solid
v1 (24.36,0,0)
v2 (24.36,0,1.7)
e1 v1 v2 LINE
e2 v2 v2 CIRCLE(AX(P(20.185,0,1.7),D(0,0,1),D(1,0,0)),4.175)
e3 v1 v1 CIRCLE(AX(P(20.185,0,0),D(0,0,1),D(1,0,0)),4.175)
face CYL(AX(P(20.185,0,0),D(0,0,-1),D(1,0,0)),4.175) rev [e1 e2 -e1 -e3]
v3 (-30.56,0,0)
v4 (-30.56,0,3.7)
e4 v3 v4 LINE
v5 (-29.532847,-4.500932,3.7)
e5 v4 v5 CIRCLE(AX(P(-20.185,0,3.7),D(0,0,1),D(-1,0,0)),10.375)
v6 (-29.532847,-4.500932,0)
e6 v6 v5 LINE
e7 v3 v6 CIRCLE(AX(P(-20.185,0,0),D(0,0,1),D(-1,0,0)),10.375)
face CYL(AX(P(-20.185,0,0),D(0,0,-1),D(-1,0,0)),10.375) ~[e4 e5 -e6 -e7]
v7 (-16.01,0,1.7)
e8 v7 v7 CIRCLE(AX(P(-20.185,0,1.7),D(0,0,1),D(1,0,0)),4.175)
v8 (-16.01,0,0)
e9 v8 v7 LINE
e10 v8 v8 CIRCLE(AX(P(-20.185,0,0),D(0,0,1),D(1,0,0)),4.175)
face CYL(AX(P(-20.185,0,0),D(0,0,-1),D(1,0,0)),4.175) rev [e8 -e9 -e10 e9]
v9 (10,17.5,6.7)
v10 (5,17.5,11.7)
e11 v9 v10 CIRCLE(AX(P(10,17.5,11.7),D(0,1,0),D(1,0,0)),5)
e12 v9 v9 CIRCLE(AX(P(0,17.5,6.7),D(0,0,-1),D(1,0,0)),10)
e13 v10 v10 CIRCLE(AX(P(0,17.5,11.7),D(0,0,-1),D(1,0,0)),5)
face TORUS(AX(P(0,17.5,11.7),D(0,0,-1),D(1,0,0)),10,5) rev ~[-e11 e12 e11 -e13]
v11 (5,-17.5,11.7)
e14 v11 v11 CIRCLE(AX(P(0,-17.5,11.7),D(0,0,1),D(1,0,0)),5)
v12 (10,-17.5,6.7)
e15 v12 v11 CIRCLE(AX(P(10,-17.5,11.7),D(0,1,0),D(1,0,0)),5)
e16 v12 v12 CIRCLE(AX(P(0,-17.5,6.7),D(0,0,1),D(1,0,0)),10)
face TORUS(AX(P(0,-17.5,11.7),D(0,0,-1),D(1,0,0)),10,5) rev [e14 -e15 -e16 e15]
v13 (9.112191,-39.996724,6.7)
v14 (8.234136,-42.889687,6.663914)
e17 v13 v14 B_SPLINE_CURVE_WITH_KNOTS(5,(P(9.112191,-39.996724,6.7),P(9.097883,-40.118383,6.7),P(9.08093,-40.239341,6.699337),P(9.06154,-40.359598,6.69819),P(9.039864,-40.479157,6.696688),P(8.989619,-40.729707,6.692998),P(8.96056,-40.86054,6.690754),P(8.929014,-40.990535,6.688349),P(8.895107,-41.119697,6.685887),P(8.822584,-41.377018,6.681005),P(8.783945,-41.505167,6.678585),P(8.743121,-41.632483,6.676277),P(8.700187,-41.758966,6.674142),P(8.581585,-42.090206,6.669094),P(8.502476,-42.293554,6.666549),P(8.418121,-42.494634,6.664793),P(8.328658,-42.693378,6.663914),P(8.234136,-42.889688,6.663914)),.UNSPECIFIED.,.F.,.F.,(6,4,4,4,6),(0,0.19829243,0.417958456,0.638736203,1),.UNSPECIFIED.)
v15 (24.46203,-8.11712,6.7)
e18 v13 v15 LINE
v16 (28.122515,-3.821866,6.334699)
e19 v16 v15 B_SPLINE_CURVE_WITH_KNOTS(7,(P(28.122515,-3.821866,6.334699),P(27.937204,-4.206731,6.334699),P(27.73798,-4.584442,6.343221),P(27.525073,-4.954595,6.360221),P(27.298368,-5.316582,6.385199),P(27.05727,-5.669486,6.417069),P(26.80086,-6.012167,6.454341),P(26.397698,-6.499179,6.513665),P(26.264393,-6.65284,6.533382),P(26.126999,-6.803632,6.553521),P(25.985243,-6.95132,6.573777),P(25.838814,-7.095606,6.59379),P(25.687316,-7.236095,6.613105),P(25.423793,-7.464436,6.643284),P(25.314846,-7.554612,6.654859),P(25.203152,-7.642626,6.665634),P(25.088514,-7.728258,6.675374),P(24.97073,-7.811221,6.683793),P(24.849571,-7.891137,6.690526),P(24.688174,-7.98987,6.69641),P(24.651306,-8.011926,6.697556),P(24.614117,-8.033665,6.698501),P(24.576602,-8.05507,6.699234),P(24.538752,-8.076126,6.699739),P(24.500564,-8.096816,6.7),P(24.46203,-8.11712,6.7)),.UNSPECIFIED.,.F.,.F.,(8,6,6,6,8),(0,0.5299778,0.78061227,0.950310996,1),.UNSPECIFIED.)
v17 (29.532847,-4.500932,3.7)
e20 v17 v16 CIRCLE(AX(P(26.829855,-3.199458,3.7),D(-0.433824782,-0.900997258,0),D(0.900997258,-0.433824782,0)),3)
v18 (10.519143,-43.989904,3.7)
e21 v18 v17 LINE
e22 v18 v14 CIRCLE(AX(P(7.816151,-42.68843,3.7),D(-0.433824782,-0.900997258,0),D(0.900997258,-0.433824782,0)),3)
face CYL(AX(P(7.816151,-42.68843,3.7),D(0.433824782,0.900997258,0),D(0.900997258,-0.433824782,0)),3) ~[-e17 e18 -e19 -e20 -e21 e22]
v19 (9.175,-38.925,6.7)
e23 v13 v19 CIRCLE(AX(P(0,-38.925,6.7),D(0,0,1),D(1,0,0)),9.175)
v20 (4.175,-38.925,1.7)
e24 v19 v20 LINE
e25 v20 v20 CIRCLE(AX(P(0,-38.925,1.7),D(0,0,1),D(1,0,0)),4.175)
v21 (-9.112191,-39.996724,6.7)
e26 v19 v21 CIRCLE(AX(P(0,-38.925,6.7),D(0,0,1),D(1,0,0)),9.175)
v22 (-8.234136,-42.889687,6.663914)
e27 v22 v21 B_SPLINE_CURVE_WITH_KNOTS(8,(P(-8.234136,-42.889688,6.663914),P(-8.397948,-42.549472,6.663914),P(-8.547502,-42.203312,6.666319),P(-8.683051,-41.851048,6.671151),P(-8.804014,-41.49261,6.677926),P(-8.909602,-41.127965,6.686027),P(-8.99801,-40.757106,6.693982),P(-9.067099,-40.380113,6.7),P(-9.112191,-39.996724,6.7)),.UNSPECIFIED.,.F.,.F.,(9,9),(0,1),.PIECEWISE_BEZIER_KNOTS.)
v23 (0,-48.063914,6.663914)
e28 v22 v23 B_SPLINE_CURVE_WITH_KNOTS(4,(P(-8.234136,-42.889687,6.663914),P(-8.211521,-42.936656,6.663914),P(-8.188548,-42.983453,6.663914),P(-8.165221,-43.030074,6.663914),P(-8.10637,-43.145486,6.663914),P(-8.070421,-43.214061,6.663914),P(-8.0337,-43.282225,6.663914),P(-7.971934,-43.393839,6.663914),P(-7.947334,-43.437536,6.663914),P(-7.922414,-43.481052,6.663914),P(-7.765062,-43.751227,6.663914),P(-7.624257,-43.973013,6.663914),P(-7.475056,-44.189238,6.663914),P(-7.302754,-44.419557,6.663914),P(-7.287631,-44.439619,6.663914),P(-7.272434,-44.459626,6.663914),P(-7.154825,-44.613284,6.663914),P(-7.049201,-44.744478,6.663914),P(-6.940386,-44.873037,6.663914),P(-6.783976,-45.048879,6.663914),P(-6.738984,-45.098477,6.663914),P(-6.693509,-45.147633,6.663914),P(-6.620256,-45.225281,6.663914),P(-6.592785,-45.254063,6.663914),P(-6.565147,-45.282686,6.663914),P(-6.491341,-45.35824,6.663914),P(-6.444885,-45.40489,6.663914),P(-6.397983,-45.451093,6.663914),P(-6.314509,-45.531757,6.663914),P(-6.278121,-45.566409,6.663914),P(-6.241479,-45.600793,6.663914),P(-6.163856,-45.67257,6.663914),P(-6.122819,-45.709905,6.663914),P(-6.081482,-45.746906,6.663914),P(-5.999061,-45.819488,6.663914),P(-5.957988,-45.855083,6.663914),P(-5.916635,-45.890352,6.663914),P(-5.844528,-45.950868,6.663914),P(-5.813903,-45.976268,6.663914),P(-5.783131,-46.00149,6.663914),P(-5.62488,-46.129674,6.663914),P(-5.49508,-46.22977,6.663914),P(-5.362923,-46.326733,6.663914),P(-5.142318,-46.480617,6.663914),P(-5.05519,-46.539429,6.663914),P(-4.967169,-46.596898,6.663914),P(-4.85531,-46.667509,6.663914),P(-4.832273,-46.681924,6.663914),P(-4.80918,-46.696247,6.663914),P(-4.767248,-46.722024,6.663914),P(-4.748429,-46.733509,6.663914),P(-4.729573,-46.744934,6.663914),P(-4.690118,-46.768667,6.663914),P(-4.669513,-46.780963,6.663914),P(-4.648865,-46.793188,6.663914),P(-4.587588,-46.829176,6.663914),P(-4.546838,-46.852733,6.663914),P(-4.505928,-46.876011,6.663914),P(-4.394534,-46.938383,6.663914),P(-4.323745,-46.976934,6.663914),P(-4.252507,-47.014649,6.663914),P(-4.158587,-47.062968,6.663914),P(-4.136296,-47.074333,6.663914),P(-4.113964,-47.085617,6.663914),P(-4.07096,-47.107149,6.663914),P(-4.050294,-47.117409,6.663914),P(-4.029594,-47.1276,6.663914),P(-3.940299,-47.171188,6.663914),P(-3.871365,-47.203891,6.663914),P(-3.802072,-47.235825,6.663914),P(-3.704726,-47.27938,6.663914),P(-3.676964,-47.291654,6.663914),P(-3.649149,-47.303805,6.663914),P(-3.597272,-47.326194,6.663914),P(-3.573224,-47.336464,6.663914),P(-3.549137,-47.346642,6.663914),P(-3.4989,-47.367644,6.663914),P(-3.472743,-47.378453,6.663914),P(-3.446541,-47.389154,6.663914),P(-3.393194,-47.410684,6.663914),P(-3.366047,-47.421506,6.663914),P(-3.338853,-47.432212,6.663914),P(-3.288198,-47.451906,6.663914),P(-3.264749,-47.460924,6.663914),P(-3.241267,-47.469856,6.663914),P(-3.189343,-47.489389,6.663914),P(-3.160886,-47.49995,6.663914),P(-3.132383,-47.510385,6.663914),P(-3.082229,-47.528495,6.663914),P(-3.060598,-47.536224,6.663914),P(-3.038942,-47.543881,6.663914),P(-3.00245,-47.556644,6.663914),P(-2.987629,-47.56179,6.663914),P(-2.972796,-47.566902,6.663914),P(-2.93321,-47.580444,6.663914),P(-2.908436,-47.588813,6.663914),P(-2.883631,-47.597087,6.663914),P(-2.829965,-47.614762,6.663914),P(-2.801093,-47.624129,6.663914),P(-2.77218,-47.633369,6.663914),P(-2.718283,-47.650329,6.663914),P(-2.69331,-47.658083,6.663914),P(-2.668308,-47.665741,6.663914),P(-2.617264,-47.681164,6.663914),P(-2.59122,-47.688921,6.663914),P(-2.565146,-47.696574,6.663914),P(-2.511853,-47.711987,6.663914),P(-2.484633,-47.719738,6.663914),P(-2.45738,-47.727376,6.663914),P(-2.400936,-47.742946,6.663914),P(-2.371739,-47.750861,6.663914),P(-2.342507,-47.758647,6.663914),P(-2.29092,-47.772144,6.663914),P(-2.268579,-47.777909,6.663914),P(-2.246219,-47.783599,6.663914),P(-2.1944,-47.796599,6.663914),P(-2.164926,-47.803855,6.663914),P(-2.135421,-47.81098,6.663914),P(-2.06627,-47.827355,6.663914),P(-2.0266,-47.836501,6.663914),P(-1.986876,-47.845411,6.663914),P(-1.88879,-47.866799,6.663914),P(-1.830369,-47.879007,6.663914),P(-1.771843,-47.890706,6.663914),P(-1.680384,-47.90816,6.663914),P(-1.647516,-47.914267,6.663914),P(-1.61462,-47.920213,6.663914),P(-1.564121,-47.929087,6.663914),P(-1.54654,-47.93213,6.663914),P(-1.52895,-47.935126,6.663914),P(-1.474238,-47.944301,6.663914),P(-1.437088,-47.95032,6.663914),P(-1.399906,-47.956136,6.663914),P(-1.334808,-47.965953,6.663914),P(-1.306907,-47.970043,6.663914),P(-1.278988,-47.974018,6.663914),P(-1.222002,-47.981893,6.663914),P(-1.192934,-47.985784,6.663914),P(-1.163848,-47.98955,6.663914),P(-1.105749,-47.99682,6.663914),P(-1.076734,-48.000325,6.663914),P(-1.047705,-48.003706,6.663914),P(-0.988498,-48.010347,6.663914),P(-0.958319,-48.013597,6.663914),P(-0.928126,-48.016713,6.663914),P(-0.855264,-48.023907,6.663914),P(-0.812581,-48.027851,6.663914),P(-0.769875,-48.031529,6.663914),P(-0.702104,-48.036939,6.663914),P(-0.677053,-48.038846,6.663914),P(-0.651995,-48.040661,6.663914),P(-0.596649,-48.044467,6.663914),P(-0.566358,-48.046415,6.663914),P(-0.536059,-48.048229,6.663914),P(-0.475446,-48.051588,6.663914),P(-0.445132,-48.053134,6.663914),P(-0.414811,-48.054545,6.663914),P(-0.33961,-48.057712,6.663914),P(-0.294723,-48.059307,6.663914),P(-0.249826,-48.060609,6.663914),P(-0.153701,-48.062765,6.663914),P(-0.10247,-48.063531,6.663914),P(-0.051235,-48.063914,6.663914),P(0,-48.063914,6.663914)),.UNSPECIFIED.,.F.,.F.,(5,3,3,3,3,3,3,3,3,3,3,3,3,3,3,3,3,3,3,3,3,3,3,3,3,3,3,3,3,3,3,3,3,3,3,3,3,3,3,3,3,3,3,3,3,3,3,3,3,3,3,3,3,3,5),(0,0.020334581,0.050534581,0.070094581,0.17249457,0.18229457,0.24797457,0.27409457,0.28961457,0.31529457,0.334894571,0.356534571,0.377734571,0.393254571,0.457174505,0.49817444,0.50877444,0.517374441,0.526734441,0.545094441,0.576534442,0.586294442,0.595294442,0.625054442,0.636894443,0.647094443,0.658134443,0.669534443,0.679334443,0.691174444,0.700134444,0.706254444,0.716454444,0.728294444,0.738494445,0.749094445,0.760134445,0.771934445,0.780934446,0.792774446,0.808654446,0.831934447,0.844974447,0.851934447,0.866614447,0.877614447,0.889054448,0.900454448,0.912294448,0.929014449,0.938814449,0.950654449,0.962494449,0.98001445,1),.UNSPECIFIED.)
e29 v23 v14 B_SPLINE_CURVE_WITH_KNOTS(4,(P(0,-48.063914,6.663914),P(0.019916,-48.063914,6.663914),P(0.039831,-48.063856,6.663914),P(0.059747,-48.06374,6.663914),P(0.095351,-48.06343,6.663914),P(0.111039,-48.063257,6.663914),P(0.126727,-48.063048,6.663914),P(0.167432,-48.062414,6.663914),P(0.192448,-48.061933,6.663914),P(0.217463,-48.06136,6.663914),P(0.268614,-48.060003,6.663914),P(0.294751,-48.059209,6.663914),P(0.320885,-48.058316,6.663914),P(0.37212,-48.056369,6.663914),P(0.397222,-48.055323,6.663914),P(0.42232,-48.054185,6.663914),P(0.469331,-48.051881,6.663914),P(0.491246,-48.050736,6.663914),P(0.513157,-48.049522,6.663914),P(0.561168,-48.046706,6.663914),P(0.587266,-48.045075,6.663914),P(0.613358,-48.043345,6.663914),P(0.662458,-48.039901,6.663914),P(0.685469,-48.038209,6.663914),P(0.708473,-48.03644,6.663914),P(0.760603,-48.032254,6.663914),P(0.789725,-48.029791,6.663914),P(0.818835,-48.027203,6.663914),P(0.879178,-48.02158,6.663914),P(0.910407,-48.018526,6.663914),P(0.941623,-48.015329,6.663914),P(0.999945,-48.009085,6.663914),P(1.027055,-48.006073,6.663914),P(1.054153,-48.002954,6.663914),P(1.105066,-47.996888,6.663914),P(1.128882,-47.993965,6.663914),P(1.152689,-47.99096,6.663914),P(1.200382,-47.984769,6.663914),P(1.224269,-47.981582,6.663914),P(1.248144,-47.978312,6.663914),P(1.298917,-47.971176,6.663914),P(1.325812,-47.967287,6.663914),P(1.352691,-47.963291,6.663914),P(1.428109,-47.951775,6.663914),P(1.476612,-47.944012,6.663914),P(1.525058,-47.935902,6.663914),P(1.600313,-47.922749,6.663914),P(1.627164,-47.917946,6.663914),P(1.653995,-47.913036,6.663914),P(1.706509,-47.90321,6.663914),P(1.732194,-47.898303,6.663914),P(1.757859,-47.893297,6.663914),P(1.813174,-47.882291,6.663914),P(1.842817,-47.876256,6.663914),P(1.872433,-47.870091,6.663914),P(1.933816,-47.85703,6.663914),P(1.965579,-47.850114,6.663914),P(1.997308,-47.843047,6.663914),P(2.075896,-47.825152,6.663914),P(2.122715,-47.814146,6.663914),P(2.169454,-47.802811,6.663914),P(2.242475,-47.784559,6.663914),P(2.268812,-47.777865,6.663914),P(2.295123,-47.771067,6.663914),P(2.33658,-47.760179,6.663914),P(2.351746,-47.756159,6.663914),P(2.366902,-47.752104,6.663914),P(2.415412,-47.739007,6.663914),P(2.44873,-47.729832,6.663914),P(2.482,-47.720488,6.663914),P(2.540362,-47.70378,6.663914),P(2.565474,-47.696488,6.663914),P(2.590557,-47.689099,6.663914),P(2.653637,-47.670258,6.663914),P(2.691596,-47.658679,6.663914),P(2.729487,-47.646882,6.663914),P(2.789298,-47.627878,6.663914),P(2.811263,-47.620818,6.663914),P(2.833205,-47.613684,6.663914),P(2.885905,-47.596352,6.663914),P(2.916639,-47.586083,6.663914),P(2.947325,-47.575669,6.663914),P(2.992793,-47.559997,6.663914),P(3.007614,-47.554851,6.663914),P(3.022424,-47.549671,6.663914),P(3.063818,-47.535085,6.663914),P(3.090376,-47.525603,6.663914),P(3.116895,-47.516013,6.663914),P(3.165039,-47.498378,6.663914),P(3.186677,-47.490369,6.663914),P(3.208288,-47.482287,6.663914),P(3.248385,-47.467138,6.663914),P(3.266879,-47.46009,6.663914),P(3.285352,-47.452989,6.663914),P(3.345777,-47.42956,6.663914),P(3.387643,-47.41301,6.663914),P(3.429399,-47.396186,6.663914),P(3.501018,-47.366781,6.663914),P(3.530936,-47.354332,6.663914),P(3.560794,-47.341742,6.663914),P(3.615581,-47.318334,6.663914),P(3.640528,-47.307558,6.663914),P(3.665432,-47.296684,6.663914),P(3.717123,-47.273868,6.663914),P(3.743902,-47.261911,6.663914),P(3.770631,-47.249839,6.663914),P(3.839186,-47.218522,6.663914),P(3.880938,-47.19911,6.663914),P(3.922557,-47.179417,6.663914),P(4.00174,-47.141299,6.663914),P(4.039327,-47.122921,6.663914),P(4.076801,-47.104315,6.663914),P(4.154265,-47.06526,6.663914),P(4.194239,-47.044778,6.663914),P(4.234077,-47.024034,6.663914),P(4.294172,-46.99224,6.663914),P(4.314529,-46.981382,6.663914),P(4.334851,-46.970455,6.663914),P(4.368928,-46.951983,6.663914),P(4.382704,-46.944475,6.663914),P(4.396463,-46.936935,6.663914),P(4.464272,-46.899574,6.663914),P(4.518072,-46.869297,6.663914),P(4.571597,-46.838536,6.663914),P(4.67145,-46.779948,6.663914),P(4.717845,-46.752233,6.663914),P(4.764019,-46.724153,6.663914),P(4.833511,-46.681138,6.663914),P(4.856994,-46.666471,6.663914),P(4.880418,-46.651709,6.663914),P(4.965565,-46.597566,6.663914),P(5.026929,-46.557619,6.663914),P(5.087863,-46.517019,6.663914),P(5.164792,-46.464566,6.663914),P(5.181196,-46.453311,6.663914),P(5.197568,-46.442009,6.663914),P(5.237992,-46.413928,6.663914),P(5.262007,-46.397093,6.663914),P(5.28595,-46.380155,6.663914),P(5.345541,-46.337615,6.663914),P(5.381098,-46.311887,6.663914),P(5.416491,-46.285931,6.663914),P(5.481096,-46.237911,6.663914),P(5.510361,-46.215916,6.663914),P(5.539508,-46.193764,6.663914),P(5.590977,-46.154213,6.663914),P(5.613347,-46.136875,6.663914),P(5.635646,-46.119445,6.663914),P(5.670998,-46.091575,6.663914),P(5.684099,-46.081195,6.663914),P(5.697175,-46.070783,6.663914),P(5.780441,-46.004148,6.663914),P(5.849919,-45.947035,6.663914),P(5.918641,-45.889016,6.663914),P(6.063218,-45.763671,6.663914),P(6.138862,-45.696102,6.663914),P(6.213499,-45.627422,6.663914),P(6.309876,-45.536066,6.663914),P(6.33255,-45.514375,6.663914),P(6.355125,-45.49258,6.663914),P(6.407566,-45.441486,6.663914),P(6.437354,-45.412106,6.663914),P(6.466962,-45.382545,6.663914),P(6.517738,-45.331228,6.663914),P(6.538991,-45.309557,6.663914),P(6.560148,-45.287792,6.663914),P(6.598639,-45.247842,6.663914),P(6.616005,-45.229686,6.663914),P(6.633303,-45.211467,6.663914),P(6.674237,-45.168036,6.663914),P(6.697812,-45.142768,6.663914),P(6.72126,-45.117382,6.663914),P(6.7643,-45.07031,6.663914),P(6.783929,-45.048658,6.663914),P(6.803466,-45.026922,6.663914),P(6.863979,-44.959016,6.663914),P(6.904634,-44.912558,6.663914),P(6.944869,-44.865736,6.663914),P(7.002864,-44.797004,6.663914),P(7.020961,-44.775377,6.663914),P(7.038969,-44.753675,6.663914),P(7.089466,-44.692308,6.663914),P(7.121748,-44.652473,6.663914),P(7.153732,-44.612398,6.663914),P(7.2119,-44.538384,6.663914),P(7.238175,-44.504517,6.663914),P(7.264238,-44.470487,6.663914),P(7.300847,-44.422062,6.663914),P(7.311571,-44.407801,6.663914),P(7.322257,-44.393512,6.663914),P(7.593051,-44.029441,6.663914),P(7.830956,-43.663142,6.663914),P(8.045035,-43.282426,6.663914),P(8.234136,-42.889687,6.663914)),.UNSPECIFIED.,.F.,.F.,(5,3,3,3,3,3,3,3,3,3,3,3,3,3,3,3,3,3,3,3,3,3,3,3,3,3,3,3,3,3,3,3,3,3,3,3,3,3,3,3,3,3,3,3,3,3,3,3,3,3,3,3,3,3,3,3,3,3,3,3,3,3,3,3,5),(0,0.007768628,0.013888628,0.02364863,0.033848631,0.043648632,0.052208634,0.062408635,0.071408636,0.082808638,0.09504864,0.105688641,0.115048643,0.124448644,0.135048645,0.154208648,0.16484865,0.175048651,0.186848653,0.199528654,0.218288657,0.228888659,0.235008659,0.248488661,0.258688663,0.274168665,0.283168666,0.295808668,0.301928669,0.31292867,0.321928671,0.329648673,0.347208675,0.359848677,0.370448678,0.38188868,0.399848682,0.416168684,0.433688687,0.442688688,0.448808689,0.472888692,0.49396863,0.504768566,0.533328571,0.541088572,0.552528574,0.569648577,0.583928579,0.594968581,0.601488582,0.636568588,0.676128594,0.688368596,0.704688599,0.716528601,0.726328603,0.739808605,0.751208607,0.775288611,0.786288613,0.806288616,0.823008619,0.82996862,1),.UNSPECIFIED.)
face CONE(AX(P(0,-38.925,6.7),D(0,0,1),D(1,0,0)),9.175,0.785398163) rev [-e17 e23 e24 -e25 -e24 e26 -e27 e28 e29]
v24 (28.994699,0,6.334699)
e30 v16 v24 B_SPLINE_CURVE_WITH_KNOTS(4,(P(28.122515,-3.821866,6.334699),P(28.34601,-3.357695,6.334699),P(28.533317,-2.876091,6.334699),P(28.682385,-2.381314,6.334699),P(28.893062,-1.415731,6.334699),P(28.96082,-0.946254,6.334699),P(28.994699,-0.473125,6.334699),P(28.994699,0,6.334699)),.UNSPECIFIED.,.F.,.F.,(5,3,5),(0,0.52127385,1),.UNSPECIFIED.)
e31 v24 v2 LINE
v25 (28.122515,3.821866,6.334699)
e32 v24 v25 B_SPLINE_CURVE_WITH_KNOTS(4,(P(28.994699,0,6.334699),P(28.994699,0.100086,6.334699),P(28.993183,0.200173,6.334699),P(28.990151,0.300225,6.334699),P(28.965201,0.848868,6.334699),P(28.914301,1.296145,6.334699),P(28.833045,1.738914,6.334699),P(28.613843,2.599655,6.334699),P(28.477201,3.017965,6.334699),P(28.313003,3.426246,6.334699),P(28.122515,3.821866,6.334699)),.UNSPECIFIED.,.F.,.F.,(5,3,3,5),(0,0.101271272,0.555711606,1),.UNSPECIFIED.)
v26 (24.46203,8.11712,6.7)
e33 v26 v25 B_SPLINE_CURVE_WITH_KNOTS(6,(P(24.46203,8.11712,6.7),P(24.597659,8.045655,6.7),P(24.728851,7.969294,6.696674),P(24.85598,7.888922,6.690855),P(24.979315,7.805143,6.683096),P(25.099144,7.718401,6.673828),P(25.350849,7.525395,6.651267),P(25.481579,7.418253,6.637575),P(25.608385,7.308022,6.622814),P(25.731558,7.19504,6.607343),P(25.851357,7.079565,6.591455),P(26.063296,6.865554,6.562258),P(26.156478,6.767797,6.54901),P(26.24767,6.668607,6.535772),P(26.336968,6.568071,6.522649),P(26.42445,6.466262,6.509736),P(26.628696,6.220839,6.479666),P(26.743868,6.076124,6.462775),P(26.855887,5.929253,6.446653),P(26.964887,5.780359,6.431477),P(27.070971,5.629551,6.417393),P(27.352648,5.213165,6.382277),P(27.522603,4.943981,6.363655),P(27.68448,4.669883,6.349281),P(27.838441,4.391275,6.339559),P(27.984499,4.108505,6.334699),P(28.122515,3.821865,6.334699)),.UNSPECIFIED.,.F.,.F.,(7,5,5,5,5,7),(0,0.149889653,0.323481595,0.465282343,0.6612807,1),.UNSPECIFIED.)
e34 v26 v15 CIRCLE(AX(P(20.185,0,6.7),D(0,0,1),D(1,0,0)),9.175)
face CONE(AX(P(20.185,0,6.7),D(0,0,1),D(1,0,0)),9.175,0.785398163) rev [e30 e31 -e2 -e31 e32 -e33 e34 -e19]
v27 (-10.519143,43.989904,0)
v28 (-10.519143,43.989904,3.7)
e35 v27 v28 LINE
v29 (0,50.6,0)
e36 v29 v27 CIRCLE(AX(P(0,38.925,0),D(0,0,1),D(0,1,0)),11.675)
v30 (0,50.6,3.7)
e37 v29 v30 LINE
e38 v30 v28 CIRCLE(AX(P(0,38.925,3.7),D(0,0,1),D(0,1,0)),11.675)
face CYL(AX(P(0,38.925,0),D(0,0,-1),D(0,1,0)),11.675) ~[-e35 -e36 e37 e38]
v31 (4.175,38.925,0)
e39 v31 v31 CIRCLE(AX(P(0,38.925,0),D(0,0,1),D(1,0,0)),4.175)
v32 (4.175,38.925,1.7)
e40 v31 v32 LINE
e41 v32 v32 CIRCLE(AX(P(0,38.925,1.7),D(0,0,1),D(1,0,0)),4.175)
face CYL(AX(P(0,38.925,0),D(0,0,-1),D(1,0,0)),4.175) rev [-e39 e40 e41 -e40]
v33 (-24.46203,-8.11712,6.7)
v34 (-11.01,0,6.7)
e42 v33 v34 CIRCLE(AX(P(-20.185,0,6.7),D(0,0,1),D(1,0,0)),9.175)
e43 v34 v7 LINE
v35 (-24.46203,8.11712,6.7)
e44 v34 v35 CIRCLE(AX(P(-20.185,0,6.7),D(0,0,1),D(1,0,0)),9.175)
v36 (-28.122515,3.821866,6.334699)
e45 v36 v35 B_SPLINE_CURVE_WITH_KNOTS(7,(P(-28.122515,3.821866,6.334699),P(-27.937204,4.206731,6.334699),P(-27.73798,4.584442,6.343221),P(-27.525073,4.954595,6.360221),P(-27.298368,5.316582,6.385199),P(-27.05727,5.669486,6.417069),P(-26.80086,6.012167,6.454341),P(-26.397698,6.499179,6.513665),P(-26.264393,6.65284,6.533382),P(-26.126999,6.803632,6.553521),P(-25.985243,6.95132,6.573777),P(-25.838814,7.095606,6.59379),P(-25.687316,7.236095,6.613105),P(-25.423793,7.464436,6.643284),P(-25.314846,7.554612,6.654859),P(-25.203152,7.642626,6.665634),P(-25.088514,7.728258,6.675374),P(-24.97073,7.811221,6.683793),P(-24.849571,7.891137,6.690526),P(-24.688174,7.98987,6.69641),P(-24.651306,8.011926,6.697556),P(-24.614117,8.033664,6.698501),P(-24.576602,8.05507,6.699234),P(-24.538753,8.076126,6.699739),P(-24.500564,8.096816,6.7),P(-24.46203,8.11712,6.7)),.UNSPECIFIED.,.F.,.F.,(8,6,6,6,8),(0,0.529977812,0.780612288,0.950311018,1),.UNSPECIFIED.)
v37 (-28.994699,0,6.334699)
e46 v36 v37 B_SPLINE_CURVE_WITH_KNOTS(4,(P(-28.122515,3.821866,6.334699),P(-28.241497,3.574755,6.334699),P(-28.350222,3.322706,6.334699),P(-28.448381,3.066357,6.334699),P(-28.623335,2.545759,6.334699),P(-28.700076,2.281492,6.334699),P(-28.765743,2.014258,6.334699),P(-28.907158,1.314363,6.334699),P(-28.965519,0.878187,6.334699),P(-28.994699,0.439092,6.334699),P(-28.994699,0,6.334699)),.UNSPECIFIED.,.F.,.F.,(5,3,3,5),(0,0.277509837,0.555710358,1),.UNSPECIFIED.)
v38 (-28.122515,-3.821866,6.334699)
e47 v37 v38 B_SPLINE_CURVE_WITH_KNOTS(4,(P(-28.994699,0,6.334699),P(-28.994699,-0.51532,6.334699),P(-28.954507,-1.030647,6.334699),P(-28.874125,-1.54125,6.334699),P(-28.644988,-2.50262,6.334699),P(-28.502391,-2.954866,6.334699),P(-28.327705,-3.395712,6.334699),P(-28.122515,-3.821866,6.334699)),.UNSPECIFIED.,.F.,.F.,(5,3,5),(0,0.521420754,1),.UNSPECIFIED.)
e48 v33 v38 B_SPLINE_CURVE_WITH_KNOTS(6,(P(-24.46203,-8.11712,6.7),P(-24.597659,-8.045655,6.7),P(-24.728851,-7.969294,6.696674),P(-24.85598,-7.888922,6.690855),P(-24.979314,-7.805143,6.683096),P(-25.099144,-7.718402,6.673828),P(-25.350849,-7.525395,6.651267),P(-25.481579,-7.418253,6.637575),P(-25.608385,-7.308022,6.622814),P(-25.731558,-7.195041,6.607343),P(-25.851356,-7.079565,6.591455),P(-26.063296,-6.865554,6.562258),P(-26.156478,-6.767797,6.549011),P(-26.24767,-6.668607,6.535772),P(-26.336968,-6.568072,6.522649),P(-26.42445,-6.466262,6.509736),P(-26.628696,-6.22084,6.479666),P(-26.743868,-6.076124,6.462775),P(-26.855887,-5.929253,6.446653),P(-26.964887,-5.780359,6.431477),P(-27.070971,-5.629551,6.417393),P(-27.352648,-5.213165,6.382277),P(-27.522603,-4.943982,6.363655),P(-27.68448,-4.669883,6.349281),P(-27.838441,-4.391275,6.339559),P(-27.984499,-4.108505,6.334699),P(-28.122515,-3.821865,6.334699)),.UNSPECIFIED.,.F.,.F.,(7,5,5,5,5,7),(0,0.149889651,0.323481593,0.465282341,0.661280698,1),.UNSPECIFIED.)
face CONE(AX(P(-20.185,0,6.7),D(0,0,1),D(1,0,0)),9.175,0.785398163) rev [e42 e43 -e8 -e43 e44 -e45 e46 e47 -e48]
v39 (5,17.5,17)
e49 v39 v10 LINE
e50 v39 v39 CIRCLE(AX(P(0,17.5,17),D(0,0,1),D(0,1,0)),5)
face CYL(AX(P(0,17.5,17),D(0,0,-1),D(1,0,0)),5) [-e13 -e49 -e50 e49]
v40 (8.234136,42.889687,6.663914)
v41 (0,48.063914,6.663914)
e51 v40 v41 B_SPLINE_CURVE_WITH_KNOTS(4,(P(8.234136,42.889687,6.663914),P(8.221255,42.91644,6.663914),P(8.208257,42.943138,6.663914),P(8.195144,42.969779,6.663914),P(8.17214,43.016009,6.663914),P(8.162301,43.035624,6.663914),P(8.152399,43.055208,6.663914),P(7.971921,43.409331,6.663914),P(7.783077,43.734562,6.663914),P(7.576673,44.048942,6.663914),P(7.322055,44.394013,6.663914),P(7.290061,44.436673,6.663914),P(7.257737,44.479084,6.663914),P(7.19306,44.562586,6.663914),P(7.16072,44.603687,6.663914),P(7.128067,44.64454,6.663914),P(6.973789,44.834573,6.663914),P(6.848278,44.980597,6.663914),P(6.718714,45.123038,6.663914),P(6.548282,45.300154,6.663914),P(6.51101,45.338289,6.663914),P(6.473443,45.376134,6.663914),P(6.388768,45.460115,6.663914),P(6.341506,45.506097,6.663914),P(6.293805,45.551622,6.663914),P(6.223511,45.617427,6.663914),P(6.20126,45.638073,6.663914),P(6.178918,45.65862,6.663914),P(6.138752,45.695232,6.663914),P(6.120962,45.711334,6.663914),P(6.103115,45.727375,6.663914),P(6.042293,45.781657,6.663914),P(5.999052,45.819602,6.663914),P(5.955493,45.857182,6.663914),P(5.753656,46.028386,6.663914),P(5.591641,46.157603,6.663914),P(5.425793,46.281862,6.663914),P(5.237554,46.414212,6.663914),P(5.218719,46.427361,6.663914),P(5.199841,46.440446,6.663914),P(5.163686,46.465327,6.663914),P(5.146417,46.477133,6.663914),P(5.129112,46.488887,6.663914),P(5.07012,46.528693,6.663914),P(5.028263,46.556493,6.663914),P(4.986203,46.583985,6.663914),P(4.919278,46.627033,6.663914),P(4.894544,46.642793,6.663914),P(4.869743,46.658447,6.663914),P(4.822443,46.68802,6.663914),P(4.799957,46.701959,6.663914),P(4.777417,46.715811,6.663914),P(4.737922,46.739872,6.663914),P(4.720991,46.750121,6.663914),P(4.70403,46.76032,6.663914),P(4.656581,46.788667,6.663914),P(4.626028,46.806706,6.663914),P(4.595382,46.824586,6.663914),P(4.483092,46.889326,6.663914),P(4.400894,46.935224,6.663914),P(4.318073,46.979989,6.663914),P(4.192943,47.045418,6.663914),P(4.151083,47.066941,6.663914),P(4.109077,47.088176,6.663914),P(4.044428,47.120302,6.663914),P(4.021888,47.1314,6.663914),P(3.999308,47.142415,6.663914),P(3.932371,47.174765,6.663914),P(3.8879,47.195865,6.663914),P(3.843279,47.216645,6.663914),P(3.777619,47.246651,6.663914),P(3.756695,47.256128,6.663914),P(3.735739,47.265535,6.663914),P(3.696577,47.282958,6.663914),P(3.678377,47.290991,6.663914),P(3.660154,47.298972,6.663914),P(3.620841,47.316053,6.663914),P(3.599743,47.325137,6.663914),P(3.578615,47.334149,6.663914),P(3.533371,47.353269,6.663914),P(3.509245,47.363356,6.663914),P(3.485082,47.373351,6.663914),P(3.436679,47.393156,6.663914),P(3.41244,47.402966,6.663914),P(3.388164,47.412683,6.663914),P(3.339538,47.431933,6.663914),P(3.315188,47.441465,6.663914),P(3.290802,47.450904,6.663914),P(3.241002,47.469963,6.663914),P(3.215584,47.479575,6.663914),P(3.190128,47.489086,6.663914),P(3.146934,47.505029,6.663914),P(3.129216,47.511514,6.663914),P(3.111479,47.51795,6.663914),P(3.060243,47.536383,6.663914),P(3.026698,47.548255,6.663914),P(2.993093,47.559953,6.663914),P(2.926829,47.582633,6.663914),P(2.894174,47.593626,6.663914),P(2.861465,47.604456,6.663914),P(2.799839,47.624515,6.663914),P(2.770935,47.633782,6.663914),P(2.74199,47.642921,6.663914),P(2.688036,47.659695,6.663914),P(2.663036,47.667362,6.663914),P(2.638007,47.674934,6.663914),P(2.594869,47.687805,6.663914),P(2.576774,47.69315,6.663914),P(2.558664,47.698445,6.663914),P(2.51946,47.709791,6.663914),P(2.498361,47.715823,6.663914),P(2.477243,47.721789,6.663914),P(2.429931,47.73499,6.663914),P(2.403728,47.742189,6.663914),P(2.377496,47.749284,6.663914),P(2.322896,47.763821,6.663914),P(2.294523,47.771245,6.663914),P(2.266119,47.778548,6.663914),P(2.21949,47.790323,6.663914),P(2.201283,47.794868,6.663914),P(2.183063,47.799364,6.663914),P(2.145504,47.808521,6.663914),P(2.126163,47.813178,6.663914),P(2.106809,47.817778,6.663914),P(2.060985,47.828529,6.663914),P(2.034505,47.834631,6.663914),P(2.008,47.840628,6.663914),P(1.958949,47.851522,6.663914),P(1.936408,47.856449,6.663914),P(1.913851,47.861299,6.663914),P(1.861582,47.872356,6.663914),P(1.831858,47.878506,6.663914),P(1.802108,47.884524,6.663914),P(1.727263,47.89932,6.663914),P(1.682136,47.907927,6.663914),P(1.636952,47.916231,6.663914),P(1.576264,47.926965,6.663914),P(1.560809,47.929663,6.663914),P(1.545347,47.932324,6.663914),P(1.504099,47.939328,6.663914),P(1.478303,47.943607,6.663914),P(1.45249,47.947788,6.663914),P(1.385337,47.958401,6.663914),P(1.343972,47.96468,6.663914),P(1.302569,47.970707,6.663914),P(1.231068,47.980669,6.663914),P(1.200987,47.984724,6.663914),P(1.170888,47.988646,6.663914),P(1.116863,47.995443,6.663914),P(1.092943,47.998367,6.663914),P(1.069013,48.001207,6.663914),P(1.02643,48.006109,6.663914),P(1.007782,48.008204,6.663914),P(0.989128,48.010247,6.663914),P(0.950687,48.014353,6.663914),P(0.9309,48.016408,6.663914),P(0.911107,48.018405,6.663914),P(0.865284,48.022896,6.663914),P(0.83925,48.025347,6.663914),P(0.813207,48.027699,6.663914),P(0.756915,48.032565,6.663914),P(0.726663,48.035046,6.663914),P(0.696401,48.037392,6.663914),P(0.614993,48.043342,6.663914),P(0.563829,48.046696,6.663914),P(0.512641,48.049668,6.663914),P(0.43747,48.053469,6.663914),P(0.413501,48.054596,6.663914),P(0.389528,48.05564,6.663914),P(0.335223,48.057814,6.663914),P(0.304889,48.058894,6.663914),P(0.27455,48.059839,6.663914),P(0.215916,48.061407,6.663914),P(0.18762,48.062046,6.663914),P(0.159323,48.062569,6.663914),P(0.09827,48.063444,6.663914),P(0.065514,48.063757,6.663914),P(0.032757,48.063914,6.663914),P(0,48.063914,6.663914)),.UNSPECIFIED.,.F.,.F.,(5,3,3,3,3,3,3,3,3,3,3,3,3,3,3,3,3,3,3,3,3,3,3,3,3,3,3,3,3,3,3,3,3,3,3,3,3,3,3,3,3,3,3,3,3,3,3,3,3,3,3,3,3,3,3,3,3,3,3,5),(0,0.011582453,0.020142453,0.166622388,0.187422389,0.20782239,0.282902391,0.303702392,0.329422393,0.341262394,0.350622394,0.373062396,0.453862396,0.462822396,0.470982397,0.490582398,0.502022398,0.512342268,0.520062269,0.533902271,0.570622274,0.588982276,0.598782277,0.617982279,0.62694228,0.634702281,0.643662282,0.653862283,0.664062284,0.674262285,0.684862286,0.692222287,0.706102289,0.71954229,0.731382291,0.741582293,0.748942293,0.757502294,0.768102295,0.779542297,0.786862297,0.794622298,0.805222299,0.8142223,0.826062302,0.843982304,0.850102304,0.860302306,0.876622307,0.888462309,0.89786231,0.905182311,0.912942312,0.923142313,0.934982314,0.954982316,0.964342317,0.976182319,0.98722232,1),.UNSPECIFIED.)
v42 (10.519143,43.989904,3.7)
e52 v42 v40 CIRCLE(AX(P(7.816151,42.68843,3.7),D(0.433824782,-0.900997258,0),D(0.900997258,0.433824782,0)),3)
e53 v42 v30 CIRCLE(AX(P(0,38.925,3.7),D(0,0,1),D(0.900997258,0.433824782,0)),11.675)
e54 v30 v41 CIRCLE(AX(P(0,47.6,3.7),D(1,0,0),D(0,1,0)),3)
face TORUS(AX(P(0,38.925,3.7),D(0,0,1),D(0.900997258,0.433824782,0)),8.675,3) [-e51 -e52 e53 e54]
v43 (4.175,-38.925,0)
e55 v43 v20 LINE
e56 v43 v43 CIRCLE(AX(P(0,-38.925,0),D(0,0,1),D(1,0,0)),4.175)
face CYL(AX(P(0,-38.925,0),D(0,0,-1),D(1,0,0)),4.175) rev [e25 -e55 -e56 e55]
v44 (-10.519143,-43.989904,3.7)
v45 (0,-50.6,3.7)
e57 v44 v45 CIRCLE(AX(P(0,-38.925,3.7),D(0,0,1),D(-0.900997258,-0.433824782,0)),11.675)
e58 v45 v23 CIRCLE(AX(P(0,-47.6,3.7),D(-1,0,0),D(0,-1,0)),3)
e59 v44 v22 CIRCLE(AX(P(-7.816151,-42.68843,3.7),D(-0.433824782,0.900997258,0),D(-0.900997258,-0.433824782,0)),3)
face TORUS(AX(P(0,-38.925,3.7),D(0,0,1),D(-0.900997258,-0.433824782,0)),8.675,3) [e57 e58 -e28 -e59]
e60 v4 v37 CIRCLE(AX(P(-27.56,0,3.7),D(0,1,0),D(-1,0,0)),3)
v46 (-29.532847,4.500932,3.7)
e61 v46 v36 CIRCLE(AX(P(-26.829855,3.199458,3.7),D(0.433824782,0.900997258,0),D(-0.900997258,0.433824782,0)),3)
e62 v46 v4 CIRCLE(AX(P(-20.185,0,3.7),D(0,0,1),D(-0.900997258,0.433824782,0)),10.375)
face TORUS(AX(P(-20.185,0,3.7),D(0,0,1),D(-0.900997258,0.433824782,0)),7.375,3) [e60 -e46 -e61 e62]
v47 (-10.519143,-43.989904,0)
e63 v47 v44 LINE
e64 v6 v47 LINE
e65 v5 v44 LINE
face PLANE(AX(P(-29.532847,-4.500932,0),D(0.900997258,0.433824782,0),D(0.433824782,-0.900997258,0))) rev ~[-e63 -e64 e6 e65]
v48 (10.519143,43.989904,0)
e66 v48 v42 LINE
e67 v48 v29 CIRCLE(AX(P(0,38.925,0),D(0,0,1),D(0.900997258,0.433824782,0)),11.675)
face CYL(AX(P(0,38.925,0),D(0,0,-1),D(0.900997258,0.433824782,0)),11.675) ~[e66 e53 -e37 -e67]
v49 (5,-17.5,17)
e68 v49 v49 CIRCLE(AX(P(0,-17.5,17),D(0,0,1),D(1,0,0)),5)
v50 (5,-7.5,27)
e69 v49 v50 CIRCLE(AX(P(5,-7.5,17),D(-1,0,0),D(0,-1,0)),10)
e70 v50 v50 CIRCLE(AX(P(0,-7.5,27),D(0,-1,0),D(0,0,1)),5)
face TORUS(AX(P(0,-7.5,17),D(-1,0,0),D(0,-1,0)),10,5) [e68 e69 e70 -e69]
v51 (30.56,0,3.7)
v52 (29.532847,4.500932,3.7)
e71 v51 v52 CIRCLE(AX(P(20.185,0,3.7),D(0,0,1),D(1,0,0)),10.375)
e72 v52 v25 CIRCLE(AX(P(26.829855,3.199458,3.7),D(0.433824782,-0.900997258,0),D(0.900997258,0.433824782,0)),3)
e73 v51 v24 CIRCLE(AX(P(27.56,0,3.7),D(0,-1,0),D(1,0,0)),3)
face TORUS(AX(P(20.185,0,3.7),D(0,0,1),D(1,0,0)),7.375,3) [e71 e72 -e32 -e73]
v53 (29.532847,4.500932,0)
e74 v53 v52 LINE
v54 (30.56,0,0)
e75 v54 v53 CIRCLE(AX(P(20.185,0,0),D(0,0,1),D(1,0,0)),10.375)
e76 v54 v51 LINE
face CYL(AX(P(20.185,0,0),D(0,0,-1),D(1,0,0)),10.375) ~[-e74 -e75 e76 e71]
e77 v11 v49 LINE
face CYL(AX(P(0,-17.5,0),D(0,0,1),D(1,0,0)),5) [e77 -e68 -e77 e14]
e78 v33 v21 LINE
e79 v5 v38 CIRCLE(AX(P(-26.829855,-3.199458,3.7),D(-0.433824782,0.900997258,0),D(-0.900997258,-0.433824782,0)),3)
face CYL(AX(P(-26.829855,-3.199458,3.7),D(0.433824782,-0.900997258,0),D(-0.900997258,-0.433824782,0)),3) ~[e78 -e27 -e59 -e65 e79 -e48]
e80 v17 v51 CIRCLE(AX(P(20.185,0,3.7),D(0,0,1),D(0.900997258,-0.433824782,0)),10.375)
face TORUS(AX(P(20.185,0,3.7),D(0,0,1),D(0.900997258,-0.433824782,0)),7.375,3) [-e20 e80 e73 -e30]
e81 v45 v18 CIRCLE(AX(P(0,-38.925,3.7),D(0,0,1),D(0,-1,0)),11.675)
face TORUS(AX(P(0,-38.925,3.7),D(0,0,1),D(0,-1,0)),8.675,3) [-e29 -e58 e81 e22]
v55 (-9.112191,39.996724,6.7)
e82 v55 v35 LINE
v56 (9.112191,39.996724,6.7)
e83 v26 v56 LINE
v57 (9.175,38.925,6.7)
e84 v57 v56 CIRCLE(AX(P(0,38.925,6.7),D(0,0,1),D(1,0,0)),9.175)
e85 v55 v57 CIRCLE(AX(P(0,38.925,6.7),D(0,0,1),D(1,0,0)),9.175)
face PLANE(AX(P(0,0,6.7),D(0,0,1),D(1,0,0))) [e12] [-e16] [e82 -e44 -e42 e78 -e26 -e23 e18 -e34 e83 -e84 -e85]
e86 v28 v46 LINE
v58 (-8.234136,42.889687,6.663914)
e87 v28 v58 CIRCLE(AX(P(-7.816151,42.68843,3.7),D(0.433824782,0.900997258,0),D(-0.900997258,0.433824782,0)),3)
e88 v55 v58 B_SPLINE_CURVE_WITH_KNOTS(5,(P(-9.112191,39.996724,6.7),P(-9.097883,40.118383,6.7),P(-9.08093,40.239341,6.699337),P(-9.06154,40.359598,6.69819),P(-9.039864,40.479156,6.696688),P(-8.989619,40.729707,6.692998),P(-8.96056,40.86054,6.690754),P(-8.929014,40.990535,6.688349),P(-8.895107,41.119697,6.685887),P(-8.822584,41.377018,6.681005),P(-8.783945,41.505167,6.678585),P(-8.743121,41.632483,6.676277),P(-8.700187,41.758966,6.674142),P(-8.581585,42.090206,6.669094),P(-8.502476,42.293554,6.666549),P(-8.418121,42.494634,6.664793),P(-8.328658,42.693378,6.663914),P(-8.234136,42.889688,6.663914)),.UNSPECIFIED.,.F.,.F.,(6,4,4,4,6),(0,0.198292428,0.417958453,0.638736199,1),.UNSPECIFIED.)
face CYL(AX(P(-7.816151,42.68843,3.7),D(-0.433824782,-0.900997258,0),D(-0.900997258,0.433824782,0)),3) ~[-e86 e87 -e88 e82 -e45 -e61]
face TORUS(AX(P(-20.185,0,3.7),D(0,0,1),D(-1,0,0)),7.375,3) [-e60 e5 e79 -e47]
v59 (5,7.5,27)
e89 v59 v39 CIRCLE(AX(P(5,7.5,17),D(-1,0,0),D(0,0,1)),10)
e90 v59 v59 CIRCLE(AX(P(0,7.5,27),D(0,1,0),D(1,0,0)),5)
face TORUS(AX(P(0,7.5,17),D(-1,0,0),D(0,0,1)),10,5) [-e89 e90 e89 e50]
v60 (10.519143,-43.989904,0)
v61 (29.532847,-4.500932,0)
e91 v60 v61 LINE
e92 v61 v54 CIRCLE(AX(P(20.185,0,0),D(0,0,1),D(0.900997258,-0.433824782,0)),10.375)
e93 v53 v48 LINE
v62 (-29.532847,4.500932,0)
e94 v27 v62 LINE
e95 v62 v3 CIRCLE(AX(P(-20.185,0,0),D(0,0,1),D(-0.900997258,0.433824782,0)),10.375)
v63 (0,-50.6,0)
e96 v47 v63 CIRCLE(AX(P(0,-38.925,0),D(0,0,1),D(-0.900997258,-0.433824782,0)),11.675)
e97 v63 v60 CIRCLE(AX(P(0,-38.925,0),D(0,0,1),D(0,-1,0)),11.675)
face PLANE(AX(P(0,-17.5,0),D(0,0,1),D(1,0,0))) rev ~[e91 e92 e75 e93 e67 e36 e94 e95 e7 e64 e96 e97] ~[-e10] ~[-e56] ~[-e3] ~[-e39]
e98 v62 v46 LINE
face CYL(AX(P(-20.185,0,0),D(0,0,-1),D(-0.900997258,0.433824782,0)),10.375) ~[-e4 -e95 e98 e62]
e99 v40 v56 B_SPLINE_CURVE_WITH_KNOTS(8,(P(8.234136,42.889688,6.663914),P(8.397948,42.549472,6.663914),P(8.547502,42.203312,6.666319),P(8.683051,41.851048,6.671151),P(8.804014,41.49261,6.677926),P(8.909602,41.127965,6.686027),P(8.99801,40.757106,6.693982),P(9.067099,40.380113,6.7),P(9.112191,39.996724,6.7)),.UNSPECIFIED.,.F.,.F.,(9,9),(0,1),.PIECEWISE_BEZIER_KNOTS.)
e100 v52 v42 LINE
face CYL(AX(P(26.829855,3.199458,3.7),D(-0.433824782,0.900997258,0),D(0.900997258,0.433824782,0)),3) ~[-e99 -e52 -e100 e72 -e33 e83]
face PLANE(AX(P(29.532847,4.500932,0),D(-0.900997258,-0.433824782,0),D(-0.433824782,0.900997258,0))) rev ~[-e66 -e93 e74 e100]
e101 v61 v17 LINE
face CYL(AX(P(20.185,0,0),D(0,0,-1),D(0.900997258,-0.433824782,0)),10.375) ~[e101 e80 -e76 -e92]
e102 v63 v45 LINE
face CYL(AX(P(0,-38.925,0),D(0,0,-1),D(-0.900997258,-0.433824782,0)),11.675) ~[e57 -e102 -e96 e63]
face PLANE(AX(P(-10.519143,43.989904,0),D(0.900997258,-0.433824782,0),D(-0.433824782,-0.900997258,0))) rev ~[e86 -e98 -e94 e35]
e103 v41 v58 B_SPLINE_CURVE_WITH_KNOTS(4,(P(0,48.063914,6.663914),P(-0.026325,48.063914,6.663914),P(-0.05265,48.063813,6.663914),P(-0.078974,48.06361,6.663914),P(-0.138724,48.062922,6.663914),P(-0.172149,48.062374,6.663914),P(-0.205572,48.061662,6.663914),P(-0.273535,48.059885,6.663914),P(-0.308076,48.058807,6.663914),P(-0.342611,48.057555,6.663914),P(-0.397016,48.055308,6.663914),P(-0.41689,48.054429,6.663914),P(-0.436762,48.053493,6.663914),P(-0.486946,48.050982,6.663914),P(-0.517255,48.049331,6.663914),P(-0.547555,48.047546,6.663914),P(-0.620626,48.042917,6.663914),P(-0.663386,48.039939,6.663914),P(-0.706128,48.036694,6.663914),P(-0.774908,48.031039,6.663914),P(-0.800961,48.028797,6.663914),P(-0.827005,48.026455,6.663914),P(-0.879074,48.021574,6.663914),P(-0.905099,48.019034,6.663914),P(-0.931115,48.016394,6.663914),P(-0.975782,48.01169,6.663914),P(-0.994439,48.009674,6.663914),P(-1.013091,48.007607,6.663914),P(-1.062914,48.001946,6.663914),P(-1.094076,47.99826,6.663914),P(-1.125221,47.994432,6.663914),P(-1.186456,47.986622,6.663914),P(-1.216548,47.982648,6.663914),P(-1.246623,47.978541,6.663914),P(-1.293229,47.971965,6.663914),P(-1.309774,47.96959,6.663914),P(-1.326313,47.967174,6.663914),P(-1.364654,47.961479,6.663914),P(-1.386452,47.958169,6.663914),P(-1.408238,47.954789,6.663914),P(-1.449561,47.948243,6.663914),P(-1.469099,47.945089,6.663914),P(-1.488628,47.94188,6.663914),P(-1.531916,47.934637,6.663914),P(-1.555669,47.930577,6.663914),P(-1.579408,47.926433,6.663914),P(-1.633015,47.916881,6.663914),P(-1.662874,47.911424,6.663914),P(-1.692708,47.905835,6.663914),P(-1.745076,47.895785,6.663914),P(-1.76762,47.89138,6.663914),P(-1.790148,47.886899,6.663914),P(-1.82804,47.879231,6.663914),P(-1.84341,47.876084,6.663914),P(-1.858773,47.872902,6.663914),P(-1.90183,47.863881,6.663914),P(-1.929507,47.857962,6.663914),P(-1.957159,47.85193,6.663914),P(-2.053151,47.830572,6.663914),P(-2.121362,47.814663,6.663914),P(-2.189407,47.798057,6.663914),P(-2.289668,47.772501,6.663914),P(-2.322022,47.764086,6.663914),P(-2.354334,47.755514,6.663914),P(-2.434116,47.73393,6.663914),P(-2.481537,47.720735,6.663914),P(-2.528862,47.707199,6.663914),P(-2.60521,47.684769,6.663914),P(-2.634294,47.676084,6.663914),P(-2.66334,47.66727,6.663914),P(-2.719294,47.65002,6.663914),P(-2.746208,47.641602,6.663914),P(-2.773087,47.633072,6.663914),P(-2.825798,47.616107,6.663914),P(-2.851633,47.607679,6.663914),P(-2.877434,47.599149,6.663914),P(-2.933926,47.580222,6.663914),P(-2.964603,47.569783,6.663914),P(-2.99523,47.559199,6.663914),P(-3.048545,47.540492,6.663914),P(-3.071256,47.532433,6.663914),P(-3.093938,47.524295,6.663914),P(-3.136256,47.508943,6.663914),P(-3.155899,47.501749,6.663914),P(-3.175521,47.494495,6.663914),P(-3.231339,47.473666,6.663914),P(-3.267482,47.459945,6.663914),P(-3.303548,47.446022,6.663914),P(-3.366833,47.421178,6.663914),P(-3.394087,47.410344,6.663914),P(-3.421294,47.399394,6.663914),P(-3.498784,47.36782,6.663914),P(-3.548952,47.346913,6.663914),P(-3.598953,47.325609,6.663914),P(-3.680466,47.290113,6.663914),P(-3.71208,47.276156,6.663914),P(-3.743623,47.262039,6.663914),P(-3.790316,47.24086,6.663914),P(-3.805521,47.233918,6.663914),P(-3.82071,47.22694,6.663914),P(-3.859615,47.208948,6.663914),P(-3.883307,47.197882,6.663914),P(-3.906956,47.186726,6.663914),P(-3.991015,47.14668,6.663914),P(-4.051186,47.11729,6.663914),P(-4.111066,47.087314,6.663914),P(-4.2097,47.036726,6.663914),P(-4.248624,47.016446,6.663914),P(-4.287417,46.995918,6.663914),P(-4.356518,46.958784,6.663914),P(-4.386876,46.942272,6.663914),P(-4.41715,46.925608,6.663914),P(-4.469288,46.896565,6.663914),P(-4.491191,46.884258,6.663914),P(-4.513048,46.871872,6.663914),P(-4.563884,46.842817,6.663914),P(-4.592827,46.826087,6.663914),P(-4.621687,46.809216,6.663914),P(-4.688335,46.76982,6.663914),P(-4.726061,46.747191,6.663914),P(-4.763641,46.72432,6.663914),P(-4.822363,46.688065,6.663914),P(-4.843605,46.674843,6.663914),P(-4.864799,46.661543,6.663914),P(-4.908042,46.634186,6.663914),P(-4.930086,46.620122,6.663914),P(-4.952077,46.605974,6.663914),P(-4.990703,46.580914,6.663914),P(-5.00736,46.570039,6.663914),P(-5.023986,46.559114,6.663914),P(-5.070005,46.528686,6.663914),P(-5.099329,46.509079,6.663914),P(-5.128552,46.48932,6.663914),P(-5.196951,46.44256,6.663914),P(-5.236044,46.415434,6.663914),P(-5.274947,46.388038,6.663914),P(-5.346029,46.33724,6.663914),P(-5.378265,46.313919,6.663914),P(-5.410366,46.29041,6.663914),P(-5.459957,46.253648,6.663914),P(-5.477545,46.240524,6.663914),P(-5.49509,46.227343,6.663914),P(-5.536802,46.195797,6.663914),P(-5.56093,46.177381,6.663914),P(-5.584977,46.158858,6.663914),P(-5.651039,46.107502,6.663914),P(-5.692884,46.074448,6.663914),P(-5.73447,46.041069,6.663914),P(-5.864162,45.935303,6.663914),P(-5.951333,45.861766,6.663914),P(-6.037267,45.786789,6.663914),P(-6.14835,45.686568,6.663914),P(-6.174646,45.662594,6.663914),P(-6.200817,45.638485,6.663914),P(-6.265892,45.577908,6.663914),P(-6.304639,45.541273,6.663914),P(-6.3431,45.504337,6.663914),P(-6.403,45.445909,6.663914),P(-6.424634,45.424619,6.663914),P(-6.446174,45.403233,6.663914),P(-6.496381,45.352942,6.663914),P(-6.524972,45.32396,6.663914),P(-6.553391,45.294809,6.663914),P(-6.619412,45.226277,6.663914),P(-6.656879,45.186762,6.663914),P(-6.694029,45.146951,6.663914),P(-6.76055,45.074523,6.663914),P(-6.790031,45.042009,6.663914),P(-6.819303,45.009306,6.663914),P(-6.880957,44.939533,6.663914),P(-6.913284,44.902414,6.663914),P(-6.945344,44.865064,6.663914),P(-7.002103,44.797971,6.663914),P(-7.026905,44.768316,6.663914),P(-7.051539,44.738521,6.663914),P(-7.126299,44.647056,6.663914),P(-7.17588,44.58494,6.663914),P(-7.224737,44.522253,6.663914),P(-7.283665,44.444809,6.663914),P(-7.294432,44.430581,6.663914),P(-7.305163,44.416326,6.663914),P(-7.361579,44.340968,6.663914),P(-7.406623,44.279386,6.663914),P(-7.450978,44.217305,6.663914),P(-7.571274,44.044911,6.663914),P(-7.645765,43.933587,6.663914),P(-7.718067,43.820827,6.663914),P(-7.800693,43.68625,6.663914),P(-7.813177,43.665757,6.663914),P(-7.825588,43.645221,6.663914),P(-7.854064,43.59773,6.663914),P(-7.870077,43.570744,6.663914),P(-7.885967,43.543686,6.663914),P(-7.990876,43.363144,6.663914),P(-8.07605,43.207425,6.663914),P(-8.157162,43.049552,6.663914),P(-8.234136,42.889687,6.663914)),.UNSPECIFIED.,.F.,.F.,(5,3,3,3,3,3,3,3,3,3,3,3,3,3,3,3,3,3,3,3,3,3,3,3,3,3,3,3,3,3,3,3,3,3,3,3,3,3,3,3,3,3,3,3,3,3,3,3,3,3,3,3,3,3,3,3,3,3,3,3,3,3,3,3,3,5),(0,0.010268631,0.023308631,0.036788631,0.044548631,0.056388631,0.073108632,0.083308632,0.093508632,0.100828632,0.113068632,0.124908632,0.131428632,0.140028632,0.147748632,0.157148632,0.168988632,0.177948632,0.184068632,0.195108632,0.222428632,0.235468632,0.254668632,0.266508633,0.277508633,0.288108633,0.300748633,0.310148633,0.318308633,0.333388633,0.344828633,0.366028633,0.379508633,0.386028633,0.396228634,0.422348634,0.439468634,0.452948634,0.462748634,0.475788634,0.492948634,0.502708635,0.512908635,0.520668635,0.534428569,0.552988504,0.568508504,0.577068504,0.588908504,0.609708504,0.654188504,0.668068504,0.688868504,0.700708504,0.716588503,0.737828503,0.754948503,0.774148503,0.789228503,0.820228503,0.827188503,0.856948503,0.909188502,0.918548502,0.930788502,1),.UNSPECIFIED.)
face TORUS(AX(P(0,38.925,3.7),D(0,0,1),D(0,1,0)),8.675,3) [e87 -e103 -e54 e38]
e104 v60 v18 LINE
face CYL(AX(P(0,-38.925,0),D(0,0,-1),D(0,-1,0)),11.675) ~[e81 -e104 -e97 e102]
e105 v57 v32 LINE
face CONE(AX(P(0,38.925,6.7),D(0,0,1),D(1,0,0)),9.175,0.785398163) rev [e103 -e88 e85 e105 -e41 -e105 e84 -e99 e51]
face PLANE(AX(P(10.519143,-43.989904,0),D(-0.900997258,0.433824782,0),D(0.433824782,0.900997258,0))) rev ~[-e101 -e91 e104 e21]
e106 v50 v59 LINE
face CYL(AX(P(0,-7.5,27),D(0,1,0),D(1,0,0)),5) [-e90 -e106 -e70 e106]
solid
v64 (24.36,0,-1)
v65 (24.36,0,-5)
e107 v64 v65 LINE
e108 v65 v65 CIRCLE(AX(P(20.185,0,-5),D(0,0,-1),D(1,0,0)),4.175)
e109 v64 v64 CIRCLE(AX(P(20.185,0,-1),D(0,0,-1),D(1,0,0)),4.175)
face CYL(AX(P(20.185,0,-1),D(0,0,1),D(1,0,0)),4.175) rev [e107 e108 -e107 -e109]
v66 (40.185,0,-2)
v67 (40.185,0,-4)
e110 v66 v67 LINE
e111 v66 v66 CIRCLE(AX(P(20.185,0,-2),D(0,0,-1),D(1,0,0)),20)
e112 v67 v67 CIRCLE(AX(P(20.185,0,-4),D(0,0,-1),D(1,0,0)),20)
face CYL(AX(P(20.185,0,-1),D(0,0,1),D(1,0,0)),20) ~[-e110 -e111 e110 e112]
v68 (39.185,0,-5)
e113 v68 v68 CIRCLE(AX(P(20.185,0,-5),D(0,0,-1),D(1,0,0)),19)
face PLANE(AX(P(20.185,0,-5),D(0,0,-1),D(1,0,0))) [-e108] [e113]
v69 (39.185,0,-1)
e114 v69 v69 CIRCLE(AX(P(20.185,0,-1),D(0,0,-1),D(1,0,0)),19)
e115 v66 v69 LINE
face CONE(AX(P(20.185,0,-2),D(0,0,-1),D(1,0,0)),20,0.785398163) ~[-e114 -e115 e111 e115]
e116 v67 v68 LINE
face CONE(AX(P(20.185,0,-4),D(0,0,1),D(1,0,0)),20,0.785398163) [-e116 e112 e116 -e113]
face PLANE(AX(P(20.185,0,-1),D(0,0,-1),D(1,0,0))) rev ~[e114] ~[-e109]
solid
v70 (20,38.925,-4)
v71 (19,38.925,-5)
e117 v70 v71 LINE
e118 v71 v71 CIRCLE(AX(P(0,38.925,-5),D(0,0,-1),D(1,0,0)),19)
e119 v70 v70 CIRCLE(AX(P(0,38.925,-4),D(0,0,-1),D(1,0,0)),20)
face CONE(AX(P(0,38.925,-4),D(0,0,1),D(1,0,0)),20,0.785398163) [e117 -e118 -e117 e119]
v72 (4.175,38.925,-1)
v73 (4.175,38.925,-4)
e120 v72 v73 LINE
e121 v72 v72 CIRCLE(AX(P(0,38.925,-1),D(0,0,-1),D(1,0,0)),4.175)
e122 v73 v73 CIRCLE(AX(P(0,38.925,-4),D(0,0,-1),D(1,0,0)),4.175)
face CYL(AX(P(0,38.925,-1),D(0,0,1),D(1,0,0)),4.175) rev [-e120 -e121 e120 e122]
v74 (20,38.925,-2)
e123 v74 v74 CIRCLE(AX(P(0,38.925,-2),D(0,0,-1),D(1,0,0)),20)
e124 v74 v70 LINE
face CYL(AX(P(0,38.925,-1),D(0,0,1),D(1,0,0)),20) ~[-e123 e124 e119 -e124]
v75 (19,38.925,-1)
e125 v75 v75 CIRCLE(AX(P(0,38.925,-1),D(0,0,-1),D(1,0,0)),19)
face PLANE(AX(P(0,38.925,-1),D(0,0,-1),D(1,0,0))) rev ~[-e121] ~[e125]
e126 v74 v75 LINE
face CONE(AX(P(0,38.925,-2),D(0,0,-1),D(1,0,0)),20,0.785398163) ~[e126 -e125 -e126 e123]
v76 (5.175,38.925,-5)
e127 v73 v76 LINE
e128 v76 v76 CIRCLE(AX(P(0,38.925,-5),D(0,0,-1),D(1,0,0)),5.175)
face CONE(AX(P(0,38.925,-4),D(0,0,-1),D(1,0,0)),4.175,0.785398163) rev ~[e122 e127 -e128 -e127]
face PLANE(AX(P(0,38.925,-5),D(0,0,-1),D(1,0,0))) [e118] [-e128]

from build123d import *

# Parameters (mm, degrees)
F0_R       = 4.175
F1_DEPTH   = 6.7
F2_R       = 3
F5_R       = 5
F7_R       = 5
F9_START   = 1
F8_R       = 20
F8_R_2     = 4.175
F9_DEPTH   = 4
F10_SIZE   = 1
F10_2_SIZE = 1


# Not quite as in the source:
# - a fillet or chamfer that OpenCascade refuses, or shapes differently, is made with other operations: its cross-section is extruded or revolved along the edge and cut away or added


with BuildPart() as f1:
    # F0 (on Top) → F1 (new body)
    with BuildSketch(Plane.XY):
        with BuildLine():
            ThreePointArc((-10.5191429835, -43.989904332), (-6.2117979251, -48.810301793), (0, -50.6))
            ThreePointArc((0, -50.6), (6.2117979251, -48.810301793), (10.5191429835, -43.989904332))
            Line((10.5191429835, -43.989904332), (29.5328465485, -4.5009321151))
            ThreePointArc((29.5328465485, -4.5009321151), (30.2999526183, -2.3083237489), (30.56, 0))
            ThreePointArc((30.56, 0), (30.2999526183, 2.3083237489), (29.5328465485, 4.5009321151))
            Line((29.5328465485, 4.5009321151), (10.5191429835, 43.989904332))
            ThreePointArc((10.5191429835, 43.989904332), (6.2117979251, 48.810301793), (0, 50.6))
            ThreePointArc((0, 50.6), (-6.2117979251, 48.810301793), (-10.5191429835, 43.989904332))
            Line((-10.5191429835, 43.989904332), (-29.5328465485, 4.5009321151))
            ThreePointArc((-29.5328465485, 4.5009321151), (-30.2999526183, 2.3083237489), (-30.56, 0))
            ThreePointArc((-30.56, 0), (-30.2999526183, -2.3083237489), (-29.5328465485, -4.5009321151))
            Line((-29.5328465485, -4.5009321151), (-10.5191429835, -43.989904332))
        make_face()
        with Locations((0, -38.925)):
            Circle(F0_R, mode=Mode.SUBTRACT)
        with Locations((-20.185, 0)):
            Circle(F0_R, mode=Mode.SUBTRACT)
        with Locations((20.185, 0)):
            Circle(F0_R, mode=Mode.SUBTRACT)
        with Locations((0, 38.925)):
            Circle(F0_R, mode=Mode.SUBTRACT)
    extrude(amount=F1_DEPTH)

    # F2
    f2_edges = [f1.edges().sort_by_distance(p)[0] for p in [
        (-20.025995, -24.245418, 6.7),
        (0, -50.6, 6.7),
        (20.025995, -24.245418, 6.7),
        (20.025995, 24.245418, 6.7),
        (0, 50.6, 6.7),
        (-20.025995, 24.245418, 6.7),
    ]]
    fillet(f2_edges, radius=F2_R)

    # F3: chamfer of 5 on 4 edges, made by hand

    # F3_s1 → F3_t2 (revolve, cut)
    with BuildSketch(Plane.XZ.offset(38.925)):
        Polygon((9.175, 6.7), (4.175, 1.7), (4.175, 6.7), align=None)
    revolve(axis=Axis((0, -38.925, 6.7), (0, 0, 1)), mode=Mode.SUBTRACT)

    # F3_s3 → F3_t4 (revolve, cut)
    with BuildSketch(Plane.XZ):
        Polygon((-11.01, 6.7), (-16.01, 1.7), (-16.01, 6.7), align=None)
    revolve(axis=Axis((-20.185, 0, 6.7), (0, 0, 1)), mode=Mode.SUBTRACT)

    # F3_s5 → F3_t6 (revolve, cut)
    with BuildSketch(Plane.XZ.offset(-38.925)):
        Polygon((9.175, 6.7), (4.175, 1.7), (4.175, 6.7), align=None)
    revolve(axis=Axis((0, 38.925, 6.7), (0, 0, 1)), mode=Mode.SUBTRACT)

    # F3_s7 → F3_t8 (revolve, cut)
    with BuildSketch(Plane.XZ):
        Polygon((29.36, 6.7), (24.36, 1.7), (24.36, 6.7), align=None)
    revolve(axis=Axis((20.185, 0, 6.7), (0, 0, 1)), mode=Mode.SUBTRACT)

    # F6: sweep along a path in F4
    with BuildLine(Plane.YZ) as f6_path:
        Line((-17.5, 0), (-17.5, 17))
        ThreePointArc((-17.5, 17), (-14.5710678119, 24.0710678119), (-7.5, 27))
        Line((-7.5, 27), (0, 27))
        Line((0, 27), (7.5, 27))
        ThreePointArc((7.5, 27), (14.5710678119, 24.0710678119), (17.5, 17))
        Line((17.5, 17), (17.5, 0))
    # F5 (on Top) → F6 (sweep)
    with BuildSketch(Plane.XY):
        with Locations((0, -17.5)):
            Circle(F5_R)
    sweep(path=f6_path.line)

    # F7
    f7_edges = [f1.edges().sort_by_distance(p)[0] for p in [
        (-5, -17.5, 6.7),
        (-5, 17.5, 6.7),
    ]]
    fillet(f7_edges, radius=F7_R)


with BuildPart() as f9:
    # F8 (on face) → F9 (new body)
    with BuildSketch(Plane(origin=(0, 0, 0), x_dir=(1, 0, 0), z_dir=(0, 0, -1)).offset(F9_START)):
        with Locations((0, -38.925)):
            Circle(F8_R)
        with Locations((0, -38.925)):
            Circle(F8_R_2, mode=Mode.SUBTRACT)
    extrude(amount=F9_DEPTH)

    # F10
    f10_edges = [f9.edges().sort_by_distance(p)[0] for p in [
        (-20, 38.925, -5),
        (-4.175, 38.925, -5),
        (-20, 38.925, -1),
    ]]
    chamfer(f10_edges, length=F10_SIZE)


with BuildPart() as f9b:
    # F8 (on face) → F9, piece 2 (new body)
    with BuildSketch(Plane(origin=(0, 0, 0), x_dir=(1, 0, 0), z_dir=(0, 0, -1)).offset(F9_START)):
        with Locations((20.185, 0)):
            Circle(F8_R)
        with Locations((20.185, 0)):
            Circle(F8_R_2, mode=Mode.SUBTRACT)
    extrude(amount=F9_DEPTH)

    # F10#2
    f10_2_edges = [f9b.edges().sort_by_distance(p)[0] for p in [
        (0.185, 0, -5),
        (0.185, 0, -1),
    ]]
    chamfer(f10_2_edges, length=F10_2_SIZE)


solid = Compound([f1.part, f9.part, f9b.part])
